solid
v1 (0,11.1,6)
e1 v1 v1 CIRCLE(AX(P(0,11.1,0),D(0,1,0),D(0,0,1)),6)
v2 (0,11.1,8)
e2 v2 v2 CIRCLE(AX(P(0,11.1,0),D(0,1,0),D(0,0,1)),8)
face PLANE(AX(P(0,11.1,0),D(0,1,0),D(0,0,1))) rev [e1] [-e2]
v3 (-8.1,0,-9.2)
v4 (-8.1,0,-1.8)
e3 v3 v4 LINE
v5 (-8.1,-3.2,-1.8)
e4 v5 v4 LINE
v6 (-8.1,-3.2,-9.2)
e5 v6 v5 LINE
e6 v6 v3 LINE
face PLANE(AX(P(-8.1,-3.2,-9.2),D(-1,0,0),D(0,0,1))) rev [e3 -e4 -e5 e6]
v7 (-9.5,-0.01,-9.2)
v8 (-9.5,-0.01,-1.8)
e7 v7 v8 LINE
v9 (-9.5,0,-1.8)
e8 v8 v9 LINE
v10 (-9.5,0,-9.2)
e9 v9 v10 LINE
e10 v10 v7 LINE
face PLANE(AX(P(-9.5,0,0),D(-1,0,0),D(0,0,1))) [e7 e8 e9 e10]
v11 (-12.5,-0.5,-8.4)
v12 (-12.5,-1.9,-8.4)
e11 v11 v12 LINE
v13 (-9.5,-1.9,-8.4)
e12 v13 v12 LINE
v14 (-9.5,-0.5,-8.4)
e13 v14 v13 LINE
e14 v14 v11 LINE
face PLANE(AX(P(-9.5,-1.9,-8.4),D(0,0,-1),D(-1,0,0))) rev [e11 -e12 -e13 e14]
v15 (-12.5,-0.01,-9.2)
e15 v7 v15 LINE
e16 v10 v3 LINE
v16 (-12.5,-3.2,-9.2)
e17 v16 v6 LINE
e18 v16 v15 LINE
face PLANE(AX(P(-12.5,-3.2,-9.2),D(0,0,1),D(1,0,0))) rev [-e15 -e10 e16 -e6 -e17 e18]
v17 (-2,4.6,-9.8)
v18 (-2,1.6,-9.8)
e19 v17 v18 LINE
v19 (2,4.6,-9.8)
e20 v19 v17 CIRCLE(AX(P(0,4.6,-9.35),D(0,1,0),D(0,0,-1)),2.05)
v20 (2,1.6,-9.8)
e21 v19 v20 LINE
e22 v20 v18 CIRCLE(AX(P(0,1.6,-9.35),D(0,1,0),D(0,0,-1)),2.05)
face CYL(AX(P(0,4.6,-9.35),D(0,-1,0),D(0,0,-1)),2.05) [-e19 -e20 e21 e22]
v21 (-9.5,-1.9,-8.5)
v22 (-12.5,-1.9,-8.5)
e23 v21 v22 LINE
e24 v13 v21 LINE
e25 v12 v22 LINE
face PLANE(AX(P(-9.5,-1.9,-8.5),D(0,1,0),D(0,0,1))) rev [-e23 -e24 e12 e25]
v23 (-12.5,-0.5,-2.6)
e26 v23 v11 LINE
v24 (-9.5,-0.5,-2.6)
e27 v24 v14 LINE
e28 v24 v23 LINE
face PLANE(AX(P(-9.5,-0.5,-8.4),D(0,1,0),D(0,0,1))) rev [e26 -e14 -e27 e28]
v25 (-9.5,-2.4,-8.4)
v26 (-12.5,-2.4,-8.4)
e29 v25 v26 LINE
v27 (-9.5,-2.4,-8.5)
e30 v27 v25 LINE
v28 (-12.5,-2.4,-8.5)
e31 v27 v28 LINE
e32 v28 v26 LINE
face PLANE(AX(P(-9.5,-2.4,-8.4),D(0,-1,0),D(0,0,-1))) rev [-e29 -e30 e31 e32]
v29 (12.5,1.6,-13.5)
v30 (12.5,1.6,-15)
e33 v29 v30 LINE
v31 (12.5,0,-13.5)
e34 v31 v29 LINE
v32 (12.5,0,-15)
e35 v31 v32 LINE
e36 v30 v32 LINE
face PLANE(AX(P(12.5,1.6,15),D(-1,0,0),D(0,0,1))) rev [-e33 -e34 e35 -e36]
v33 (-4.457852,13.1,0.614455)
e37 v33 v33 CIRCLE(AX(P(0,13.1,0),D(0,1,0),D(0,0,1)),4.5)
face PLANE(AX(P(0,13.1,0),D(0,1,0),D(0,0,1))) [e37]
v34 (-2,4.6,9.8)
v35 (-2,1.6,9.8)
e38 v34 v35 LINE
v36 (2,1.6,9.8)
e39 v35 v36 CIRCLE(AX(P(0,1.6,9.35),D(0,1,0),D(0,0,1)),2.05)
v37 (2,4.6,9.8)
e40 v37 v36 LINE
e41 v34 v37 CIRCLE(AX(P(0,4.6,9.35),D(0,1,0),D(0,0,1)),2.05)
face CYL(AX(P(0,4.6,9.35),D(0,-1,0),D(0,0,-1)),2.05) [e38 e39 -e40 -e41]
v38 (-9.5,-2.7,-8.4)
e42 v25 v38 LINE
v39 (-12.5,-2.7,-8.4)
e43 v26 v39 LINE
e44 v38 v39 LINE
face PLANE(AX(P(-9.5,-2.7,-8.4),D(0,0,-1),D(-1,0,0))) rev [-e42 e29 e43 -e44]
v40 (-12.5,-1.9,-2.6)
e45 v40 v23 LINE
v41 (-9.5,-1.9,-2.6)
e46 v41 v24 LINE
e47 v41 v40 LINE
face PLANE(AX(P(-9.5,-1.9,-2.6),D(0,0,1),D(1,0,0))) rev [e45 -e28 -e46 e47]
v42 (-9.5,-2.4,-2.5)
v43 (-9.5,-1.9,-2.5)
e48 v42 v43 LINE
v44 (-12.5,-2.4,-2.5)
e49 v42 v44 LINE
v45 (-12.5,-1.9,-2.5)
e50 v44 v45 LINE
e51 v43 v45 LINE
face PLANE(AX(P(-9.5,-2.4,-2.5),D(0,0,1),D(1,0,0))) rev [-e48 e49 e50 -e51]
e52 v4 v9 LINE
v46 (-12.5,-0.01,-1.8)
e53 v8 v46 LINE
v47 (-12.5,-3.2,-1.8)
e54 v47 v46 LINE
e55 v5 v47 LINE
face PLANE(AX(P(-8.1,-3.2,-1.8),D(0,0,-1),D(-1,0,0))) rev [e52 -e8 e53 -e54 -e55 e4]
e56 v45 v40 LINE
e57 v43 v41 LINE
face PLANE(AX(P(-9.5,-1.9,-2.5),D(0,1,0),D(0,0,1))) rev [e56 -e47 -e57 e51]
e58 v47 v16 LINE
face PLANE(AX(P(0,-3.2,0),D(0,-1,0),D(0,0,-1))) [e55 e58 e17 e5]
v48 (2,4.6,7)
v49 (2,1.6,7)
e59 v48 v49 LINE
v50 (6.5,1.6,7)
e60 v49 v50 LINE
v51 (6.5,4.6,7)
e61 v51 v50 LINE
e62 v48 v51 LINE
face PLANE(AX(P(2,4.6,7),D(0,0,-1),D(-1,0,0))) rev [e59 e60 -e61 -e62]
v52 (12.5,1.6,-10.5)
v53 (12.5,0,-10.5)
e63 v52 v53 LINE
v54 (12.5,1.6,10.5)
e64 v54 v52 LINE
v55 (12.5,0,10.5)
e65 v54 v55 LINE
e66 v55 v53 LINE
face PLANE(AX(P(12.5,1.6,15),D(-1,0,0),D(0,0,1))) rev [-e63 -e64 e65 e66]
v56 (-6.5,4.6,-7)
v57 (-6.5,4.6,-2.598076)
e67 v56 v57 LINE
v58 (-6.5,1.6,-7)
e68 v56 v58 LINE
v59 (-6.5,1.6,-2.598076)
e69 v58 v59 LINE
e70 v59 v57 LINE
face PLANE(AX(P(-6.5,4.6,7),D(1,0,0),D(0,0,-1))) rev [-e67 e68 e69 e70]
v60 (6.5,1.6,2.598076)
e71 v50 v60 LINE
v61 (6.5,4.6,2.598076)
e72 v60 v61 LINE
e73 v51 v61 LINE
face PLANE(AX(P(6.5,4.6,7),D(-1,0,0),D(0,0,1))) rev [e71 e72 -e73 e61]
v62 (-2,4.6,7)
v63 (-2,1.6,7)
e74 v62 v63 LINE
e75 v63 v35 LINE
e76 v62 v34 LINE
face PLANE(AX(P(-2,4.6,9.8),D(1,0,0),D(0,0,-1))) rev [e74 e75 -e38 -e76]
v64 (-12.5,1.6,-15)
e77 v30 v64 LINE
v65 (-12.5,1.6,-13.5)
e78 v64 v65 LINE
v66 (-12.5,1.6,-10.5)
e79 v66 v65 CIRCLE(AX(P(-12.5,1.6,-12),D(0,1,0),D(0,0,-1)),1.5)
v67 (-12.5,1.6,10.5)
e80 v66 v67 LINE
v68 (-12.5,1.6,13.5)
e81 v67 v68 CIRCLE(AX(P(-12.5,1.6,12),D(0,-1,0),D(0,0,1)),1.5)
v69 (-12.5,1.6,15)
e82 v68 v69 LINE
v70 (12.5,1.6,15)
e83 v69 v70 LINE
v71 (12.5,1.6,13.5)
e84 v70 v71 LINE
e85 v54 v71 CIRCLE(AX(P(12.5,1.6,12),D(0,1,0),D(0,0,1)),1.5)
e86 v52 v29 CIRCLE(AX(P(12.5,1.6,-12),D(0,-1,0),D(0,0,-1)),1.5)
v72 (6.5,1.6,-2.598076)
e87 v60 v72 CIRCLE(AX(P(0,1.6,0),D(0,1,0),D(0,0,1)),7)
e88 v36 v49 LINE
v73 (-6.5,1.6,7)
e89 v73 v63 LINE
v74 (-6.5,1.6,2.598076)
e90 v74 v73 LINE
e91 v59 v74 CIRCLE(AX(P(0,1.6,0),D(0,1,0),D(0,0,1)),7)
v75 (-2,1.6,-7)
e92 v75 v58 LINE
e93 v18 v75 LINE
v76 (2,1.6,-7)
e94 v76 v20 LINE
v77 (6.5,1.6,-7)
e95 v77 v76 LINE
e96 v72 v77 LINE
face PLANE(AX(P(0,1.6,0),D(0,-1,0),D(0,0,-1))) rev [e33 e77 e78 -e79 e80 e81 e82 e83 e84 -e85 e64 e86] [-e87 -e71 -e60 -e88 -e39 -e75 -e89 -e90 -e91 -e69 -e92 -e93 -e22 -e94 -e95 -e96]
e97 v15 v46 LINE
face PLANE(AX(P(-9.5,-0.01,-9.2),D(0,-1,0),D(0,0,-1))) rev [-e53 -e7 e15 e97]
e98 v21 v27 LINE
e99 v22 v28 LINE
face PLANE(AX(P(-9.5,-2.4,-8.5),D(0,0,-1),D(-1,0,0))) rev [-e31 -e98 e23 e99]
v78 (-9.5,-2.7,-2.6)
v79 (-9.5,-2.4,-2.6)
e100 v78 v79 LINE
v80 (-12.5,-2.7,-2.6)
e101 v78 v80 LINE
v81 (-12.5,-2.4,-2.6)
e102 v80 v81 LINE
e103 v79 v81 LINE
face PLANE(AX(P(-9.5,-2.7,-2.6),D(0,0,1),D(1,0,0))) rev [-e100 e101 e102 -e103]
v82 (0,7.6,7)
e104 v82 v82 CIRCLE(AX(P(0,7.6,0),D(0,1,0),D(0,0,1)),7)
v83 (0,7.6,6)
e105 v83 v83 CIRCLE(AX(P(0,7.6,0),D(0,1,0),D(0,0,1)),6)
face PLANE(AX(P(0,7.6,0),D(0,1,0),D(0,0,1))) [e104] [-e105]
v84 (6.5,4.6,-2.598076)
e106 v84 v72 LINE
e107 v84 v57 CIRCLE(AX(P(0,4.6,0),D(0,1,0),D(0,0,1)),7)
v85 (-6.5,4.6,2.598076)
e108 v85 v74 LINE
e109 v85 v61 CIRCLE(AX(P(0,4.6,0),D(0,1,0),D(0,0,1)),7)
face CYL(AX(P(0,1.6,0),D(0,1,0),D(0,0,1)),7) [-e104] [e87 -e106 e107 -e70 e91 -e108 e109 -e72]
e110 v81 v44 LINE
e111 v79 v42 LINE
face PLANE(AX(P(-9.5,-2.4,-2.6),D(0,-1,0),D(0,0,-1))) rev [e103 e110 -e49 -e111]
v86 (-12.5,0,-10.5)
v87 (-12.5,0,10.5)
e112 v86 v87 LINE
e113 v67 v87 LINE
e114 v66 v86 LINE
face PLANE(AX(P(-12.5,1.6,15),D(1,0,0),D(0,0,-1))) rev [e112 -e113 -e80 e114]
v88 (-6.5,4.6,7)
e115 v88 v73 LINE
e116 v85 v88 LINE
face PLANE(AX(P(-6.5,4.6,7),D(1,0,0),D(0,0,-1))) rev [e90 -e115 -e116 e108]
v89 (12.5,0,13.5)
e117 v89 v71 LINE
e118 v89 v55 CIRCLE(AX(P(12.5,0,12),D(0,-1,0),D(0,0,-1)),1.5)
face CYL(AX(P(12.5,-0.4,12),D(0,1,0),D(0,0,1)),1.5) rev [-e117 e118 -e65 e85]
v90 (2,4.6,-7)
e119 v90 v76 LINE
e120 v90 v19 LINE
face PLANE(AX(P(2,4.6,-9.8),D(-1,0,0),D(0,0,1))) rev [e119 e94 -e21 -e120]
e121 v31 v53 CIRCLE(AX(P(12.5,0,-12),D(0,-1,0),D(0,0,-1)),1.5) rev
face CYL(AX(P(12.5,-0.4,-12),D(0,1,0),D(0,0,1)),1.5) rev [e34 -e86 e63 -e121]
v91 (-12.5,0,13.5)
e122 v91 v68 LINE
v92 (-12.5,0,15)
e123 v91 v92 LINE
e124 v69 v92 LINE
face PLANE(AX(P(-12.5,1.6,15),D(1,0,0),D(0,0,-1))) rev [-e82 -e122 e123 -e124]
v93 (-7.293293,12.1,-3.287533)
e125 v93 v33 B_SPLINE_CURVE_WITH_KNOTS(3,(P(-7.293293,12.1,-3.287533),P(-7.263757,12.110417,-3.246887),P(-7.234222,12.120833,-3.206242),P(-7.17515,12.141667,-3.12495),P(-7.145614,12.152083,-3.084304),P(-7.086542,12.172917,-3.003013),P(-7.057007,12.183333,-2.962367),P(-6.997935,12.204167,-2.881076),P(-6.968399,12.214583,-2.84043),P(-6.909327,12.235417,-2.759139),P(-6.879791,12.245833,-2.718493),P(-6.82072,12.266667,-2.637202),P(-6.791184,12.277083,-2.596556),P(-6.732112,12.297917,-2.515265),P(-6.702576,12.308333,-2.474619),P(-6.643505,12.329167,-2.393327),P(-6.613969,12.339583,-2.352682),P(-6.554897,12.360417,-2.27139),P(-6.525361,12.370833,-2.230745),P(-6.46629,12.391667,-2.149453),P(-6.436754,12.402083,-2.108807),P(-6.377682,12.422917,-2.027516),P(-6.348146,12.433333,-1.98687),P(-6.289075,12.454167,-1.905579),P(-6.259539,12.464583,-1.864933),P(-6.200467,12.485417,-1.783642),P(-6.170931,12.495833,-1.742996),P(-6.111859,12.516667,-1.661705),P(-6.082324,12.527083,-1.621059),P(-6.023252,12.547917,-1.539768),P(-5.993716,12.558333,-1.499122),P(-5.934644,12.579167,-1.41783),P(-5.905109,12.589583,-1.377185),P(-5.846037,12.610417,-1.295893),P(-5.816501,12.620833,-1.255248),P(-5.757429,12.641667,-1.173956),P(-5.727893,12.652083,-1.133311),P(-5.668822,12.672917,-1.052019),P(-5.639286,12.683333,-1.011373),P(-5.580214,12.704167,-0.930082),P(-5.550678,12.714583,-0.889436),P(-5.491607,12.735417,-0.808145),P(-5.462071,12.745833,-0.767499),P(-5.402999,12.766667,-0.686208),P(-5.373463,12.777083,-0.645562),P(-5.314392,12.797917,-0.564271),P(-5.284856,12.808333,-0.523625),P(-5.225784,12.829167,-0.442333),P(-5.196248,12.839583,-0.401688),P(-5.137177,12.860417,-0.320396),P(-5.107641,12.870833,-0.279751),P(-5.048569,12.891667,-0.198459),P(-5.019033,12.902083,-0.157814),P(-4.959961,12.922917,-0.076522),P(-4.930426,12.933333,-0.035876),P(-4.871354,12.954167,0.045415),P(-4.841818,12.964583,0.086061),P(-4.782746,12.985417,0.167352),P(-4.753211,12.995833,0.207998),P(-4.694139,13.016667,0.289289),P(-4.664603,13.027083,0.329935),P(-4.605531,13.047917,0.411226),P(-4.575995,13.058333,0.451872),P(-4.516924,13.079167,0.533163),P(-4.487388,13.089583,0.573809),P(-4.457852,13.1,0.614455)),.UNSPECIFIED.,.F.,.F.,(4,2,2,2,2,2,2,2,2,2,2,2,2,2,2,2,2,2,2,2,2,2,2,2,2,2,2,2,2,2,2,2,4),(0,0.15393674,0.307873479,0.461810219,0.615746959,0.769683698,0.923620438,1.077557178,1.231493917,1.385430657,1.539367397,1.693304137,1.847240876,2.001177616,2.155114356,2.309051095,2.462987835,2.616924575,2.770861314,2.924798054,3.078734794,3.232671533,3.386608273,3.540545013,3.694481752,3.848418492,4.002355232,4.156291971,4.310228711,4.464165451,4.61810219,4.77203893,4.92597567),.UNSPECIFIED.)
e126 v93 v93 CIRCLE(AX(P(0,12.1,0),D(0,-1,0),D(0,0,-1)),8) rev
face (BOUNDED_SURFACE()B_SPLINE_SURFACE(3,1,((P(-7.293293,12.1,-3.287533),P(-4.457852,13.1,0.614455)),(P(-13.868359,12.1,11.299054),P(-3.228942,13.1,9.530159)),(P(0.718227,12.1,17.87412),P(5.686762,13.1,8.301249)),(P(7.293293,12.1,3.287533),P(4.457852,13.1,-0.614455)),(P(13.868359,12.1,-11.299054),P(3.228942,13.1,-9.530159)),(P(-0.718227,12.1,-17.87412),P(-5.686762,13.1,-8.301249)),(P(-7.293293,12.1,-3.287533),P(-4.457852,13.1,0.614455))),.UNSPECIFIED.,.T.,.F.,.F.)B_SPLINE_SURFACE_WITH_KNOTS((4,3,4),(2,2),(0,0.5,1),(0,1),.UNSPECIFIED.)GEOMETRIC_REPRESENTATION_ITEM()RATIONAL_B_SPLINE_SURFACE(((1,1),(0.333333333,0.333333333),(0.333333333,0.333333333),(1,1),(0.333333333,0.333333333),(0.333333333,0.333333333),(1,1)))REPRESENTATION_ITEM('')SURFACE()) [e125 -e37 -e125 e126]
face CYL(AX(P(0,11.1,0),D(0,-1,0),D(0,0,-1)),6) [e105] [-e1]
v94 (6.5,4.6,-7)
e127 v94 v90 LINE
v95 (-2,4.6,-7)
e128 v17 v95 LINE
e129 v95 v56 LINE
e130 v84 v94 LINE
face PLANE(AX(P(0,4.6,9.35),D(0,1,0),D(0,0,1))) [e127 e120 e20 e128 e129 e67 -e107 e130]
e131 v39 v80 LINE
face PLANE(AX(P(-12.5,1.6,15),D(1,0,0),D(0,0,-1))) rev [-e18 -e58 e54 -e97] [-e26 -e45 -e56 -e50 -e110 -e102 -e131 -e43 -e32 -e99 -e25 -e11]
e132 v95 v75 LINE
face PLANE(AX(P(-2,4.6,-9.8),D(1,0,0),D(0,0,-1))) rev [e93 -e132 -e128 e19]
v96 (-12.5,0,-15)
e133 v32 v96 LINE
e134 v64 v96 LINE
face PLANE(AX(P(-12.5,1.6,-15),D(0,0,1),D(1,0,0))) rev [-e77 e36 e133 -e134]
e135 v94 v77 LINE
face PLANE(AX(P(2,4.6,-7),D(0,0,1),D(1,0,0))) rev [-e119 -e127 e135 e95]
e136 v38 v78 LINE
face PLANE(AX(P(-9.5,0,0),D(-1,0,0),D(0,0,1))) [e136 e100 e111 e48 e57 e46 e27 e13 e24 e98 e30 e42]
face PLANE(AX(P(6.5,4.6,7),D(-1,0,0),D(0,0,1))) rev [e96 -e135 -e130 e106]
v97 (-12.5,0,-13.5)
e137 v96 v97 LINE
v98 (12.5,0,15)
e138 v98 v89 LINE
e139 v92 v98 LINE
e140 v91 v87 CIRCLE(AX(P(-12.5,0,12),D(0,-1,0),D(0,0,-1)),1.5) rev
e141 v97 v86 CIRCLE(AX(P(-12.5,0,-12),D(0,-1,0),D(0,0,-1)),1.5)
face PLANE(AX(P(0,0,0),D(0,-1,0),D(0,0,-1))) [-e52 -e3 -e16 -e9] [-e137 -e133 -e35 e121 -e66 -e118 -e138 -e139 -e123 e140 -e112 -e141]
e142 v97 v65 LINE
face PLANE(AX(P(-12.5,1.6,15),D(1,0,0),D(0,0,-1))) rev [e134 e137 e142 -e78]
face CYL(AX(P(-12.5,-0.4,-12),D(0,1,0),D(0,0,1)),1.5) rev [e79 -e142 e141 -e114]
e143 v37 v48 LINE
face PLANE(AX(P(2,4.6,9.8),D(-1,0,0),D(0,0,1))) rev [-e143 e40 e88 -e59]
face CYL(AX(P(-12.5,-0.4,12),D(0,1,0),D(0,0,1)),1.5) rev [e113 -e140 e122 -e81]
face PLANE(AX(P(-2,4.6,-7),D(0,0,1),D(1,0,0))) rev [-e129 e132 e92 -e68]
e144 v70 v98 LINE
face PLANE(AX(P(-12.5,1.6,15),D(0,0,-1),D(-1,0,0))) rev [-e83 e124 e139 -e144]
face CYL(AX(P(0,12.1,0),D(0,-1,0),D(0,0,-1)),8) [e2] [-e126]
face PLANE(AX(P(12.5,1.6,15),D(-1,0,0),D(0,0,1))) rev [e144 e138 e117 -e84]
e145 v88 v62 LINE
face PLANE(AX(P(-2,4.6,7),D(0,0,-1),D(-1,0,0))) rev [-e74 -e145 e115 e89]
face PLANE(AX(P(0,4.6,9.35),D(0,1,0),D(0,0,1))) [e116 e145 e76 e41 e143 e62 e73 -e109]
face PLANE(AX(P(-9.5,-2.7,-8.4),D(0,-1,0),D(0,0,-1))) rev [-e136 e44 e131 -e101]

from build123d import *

# Parameters (mm, degrees)
SKETCH1_W               = 25
SKETCH1_H               = 30
BOSS_EXTRUDE1_DEPTH     = 1.6
BOSS_EXTRUDE2_DEPTH     = 3
SKETCH3_R               = 7
BOSS_EXTRUDE3_DEPTH     = 3
BOSS_EXTRUDE4_START     = 3
SKETCH4_R               = 7
BOSS_EXTRUDE4_DEPTH     = 3
SKETCH5_R               = 6
BOSS_EXTRUDE5_DEPTH     = 3.5
SKETCH6_R               = 8
BOSS_EXTRUDE6_DEPTH     = 1
SKETCH10_R              = 1.5
CUT_EXTRUDE1_DEPTH      = 2
MIRROR2_COPY_1_SKETCH_R = 1.5
MIRROR2_COPY_1_DEPTH    = 2
SKETCH11_W              = 4.4
SKETCH11_H              = 7.4
BOSS_EXTRUDE7_DEPTH     = 3.2
CUT_EXTRUDE2_DEPTH      = 3
SKETCH13_W              = 7.4
SKETCH13_H              = 0.01
CUT_EXTRUDE3_DEPTH      = 3


with BuildPart() as part:
    # Sketch1 → Boss-Extrude1 (new body)
    with BuildSketch(Plane(origin=(0, 0, 0), x_dir=(1, 0, 0), z_dir=(0, 1, 0))):
        Rectangle(SKETCH1_W, SKETCH1_H)
    extrude(amount=BOSS_EXTRUDE1_DEPTH)

    # Sketch2 → Boss-Extrude2 (add)
    with BuildSketch(Plane(origin=(0, 1.6, 0), x_dir=(1, 0, 0), z_dir=(0, 1, 0))):
        with BuildLine():
            Line((2, -9.8), (2, -7))
            Line((2, -7), (6.5, -7))
            Line((6.5, -7), (6.5, 7))
            Line((6.5, 7), (2, 7))
            Line((2, 7), (2, 9.8))
            ThreePointArc((2, 9.8), (0, 11.4), (-2, 9.8))
            Line((-2, 9.8), (-2, 7))
            Line((-2, 7), (-6.5, 7))
            Line((-6.5, 7), (-6.5, -7))
            Line((-6.5, -7), (-2, -7))
            Line((-2, -7), (-2, -9.8))
            ThreePointArc((-2, -9.8), (0, -11.4), (2, -9.8))
        make_face()
    extrude(amount=BOSS_EXTRUDE2_DEPTH)

    # Sketch3 → Boss-Extrude3 (add)
    with BuildSketch(Plane(origin=(0, 4.6, 0), x_dir=(1, 0, 0), z_dir=(0, 1, 0))):
        Circle(SKETCH3_R)
    extrude(amount=-BOSS_EXTRUDE3_DEPTH)

    # Sketch4 → Boss-Extrude4 (add)
    with BuildSketch(Plane(origin=(0, 4.6, 0), x_dir=(1, 0, 0), z_dir=(0, 1, 0)).offset(BOSS_EXTRUDE4_START)):
        with Locations(Location((0, 0, 0), (0, 0, 270))):
            Circle(SKETCH4_R)
    extrude(amount=-BOSS_EXTRUDE4_DEPTH)

    # Sketch5 → Boss-Extrude5 (add)
    with BuildSketch(Plane(origin=(0, 7.6, 0), x_dir=(1, 0, 0), z_dir=(0, 1, 0))):
        with Locations(Location((0, 0, 0), (0, 0, 270))):
            Circle(SKETCH5_R)
    extrude(amount=BOSS_EXTRUDE5_DEPTH)

    # Sketch6 → Boss-Extrude6 (add)
    with BuildSketch(Plane(origin=(0, 11.1, 0), x_dir=(1, 0, 0), z_dir=(0, 1, 0))):
        with Locations(Location((0, 0, 0), (0, 0, 270))):
            Circle(SKETCH6_R)
    extrude(amount=BOSS_EXTRUDE6_DEPTH)

    # Loft1: read off the stored shape, not the designer's step
    # Loft1: loft between two sections, ruled curve by curve
    loft1_from = [
        Edge.make_bspline([(-7.29329327, 12.1, -3.287533007), (-13.868359284, 12.1, 11.299053534), (0.718227257, 12.1, 17.874119548), (7.29329327, 12.1, 3.287533007), (13.868359284, 12.1, -11.299053534), (-0.718227257, 12.1, -17.874119548), (-7.29329327, 12.1, -3.287533007)], [0, 0, 0, 0, 0.5, 0.5, 0.5, 1, 1, 1, 1], 3, [1, 0.333333333, 0.333333333, 1, 0.333333333, 0.333333333, 1]),
    ]
    loft1_to = [
        Edge.make_bspline([(-4.457852082, 13.1, 0.614454893), (-3.228942297, 13.1, 9.530159057), (5.686761867, 13.1, 8.301249271), (4.457852082, 13.1, -0.614454893), (3.228942297, 13.1, -9.530159057), (-5.686761867, 13.1, -8.301249271), (-4.457852082, 13.1, 0.614454893)], [0, 0, 0, 0, 0.5, 0.5, 0.5, 1, 1, 1, 1], 3, [1, 0.333333333, 0.333333333, 1, 0.333333333, 0.333333333, 1]),
    ]
    loft1 = Solid(Shell([*[Face.make_surface_from_curves(loft1_from[k], loft1_to[k]) for k in range(1)], Face(Wire(loft1_from)), Face(Wire(loft1_to))]))
    add(loft1)

    # Sketch10 → Cut-Extrude1 (cut)
    with BuildSketch(Plane(origin=(0, 1.6, 0), x_dir=(1, 0, 0), z_dir=(0, 1, 0))):
        with Locations((12.5, -12)):
            Circle(SKETCH10_R)
    cut_extrude1 = extrude(amount=-CUT_EXTRUDE1_DEPTH, mode=Mode.SUBTRACT)

    # Mirror1: Cut-Extrude1 across plane
    add(cut_extrude1.mirror(Plane.ZY), mode=Mode.SUBTRACT)

    # Mirror2: Cut-Extrude1 across plane
    add(cut_extrude1.mirror(Plane.XY), mode=Mode.SUBTRACT)

    # Mirror2 copy 1 sketch → Mirror2 copy 1 (cut)
    with BuildSketch(Plane(origin=(0, 1.6, 0), x_dir=(-1, 0, 0), z_dir=(0, 1, 0))):
        with Locations((12.5, -12)):
            Circle(MIRROR2_COPY_1_SKETCH_R)
    extrude(amount=-MIRROR2_COPY_1_DEPTH, mode=Mode.SUBTRACT)

    # Sketch11 → Boss-Extrude7 (add)
    with BuildSketch(Plane(origin=(0, 0, 0), x_dir=(-1, 0, 0), z_dir=(0, -1, 0))):
        with Locations((10.3, 5.5)):
            Rectangle(SKETCH11_W, SKETCH11_H)
    extrude(amount=BOSS_EXTRUDE7_DEPTH)

    # Sketch12 → Cut-Extrude2 (cut)
    with BuildSketch(Plane.ZY.offset(12.5)):
        Polygon((-8.4, -2.7), (-2.6, -2.7), (-2.6, -2.4), (-2.5, -2.4), (-2.5, -1.9), (-2.6, -1.9), (-2.6, -0.5), (-8.4, -0.5), (-8.4, -1.9), (-8.5, -1.9), (-8.5, -2.4), (-8.4, -2.4), align=None)
    extrude(amount=-CUT_EXTRUDE2_DEPTH, mode=Mode.SUBTRACT)

    # Sketch13 → Cut-Extrude3 (cut)
    with BuildSketch(Plane.ZY.offset(12.5)):
        with Locations((-5.5, -0.005)):
            Rectangle(SKETCH13_W, SKETCH13_H)
    extrude(amount=-CUT_EXTRUDE3_DEPTH, mode=Mode.SUBTRACT)


solid = part.part
